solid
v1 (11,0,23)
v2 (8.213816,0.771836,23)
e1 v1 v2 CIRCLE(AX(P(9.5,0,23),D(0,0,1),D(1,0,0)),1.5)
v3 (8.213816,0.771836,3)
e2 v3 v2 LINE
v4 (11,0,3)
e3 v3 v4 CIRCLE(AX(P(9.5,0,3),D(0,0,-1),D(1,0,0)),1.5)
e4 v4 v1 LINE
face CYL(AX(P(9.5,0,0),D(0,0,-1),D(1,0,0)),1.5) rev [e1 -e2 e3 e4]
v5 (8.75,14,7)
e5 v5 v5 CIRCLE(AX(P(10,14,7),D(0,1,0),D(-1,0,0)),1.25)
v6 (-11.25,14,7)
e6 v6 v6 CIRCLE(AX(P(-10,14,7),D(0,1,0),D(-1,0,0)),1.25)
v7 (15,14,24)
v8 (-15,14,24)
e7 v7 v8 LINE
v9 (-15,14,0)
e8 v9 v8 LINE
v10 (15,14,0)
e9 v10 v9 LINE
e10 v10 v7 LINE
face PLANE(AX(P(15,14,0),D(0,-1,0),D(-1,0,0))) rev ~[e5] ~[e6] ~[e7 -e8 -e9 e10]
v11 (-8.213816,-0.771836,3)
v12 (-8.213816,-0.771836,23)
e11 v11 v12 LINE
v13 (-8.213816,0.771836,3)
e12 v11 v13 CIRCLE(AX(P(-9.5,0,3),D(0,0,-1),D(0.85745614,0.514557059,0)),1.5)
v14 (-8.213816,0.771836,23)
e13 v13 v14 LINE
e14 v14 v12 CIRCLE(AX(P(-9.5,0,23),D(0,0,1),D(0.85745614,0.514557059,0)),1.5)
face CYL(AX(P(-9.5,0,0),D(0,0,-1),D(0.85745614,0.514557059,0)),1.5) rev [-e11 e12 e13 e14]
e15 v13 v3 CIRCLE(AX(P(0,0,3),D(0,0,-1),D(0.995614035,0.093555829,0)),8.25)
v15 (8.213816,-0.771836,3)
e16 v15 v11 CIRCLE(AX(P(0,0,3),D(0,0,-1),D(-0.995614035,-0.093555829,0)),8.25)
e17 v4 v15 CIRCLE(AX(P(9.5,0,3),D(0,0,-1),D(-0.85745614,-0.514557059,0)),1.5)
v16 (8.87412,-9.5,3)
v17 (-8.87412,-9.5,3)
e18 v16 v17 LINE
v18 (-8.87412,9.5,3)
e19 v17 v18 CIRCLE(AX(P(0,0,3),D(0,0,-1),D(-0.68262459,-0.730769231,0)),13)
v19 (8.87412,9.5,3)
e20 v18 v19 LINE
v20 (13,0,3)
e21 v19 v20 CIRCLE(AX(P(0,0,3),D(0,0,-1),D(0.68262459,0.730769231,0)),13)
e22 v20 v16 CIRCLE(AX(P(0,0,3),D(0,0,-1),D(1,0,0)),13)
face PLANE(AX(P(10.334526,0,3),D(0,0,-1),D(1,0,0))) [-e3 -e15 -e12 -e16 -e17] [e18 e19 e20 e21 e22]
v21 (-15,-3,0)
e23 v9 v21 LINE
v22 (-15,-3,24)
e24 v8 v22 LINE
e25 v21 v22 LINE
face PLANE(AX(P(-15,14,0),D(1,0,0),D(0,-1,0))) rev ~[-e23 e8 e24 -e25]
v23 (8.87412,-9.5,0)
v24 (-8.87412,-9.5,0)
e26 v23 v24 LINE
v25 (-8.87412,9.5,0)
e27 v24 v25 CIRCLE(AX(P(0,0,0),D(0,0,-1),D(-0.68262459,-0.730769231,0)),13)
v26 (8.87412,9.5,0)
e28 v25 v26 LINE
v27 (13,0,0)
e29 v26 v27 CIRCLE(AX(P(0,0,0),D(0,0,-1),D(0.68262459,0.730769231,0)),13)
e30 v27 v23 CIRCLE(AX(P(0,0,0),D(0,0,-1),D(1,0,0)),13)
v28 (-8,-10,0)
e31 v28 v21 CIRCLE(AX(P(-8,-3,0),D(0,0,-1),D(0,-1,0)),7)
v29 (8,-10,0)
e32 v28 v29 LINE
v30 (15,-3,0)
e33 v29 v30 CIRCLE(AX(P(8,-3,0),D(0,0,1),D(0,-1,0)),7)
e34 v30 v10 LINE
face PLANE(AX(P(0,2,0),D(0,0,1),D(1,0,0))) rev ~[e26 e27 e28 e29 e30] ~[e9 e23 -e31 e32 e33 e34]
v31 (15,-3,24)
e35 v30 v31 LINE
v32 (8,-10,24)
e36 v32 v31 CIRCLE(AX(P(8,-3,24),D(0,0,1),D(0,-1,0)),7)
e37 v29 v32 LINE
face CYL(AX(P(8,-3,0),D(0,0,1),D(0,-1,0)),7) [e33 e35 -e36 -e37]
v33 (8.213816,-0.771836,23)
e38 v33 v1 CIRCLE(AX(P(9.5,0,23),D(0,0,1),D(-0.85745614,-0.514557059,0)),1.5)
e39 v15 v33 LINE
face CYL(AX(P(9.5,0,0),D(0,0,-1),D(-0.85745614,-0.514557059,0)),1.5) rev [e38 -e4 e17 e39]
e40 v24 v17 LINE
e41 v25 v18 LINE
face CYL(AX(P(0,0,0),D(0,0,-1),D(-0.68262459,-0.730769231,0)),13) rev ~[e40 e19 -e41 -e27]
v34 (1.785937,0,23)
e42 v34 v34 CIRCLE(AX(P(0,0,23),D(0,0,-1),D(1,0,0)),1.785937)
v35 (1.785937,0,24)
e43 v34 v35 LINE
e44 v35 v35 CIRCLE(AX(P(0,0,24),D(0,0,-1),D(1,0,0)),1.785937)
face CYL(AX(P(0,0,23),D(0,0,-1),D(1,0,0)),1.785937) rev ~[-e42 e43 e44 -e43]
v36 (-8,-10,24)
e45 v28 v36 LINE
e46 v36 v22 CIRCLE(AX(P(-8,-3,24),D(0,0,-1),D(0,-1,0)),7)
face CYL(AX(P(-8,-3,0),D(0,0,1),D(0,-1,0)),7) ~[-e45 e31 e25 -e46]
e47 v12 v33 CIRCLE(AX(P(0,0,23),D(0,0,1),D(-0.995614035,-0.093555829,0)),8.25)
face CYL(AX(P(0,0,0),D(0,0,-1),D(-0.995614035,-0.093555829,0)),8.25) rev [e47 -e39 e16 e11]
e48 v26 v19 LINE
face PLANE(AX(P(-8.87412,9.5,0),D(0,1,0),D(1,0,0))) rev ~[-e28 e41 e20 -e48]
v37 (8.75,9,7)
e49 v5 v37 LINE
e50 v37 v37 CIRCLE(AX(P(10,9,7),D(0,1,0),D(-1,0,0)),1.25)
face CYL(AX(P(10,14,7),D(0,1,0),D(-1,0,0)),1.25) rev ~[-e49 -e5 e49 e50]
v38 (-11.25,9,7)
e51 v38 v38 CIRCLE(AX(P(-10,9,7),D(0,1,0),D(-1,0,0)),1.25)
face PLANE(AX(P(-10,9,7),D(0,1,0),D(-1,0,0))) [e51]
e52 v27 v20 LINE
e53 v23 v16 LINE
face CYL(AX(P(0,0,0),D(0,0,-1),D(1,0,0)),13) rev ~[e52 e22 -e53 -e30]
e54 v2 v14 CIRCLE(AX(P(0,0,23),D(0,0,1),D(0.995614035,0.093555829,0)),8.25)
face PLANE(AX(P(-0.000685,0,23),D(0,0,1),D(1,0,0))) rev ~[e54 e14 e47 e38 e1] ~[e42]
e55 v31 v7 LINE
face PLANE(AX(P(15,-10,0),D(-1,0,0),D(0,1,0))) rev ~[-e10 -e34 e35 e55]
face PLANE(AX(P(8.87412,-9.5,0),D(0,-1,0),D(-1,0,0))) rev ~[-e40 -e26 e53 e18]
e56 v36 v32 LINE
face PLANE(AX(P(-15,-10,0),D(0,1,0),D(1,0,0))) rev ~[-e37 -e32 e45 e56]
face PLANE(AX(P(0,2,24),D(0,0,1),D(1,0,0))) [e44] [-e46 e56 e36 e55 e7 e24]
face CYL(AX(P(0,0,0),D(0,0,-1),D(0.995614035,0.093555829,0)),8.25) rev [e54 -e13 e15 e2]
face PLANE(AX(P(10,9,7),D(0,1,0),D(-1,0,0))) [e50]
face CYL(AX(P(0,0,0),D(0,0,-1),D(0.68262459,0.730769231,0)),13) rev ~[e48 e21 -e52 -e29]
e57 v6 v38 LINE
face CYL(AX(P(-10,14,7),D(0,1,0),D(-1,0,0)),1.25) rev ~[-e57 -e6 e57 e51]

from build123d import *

# Parameters (mm, degrees)
F1_DEPTH = 24
F3_DEPTH = 23
F4_R     = 1.7859375
F5_DEPTH = 25
F7_DEPTH = 3
F8_R     = 1.25
F9_DEPTH = 5
F10_R    = 7


with BuildPart() as f1:
    # F0 (on Top) → F1 (new body)
    with BuildSketch(Plane.XY):
        Polygon((-15, -10), (15, -10), (15, 0), (15, 10), (15, 14), (-15, 14), (-15, 10), (-15, 0), align=None)
    extrude(amount=F1_DEPTH)

    # F2 (on Top) → F3 (cut)
    with BuildSketch(Plane.XY):
        with BuildLine():
            ThreePointArc((-8.2138157895, 0.7718355891), (-8.0544419216, 0.4004520472), (-8, 0))
            ThreePointArc((-8, 0), (-8.0544419216, -0.4004520472), (-8.2138157895, -0.7718355891))
            ThreePointArc((-8.2138157895, -0.7718355891), (0, -8.25), (8.2138157895, -0.7718355891))
            ThreePointArc((8.2138157895, -0.7718355891), (8, 0), (8.2138157895, 0.7718355891))
            ThreePointArc((8.2138157895, 0.7718355891), (0, 8.25), (-8.2138157895, 0.7718355891))
        make_face()
        with BuildLine():
            ThreePointArc((-8.2138157895, -0.7718355891), (-8.25, 0), (-8.2138157895, 0.7718355891))
            ThreePointArc((-8.2138157895, 0.7718355891), (-11, 0), (-8.2138157895, -0.7718355891))
        make_face()
        with BuildLine():
            ThreePointArc((-8.2138157895, -0.7718355891), (-8.0544419216, -0.4004520472), (-8, 0))
            ThreePointArc((-8, 0), (-8.0544419216, 0.4004520472), (-8.2138157895, 0.7718355891))
            ThreePointArc((-8.2138157895, 0.7718355891), (-8.25, 0), (-8.2138157895, -0.7718355891))
        make_face()
        with BuildLine():
            ThreePointArc((8.25, 0), (8.2409489825, 0.3863416473), (8.2138157895, 0.7718355891))
            ThreePointArc((8.2138157895, 0.7718355891), (8, 0), (8.2138157895, -0.7718355891))
            ThreePointArc((8.2138157895, -0.7718355891), (8.2409489825, -0.3863416473), (8.25, 0))
        make_face()
        with BuildLine():
            ThreePointArc((11, 0), (9.9004520472, 1.4455580784), (8.2138157895, 0.7718355891))
            ThreePointArc((8.2138157895, 0.7718355891), (8.2409489825, 0.3863416473), (8.25, 0))
            ThreePointArc((8.25, 0), (8.2409489825, -0.3863416473), (8.2138157895, -0.7718355891))
            ThreePointArc((8.2138157895, -0.7718355891), (9.9004520472, -1.4455580784), (11, 0))
        make_face()
    extrude(amount=F3_DEPTH, mode=Mode.SUBTRACT)

    # F4 (on face) → F5 (cut)
    with BuildSketch(Plane(origin=(0, 0, 23), x_dir=(1, 0, 0), z_dir=(0, 0, -1))):
        Circle(F4_R)
    extrude(amount=-F5_DEPTH, mode=Mode.SUBTRACT)

    # F6 (on face) → F7 (cut)
    with BuildSketch(Plane(origin=(0, 0, 0), x_dir=(1, 0, 0), z_dir=(0, 0, -1))):
        with BuildLine():
            ThreePointArc((8.8741196746, -9.5), (11.9240000791, -5.1786312974), (13, 0))
            ThreePointArc((13, 0), (11.9240000791, 5.1786312974), (8.8741196746, 9.5))
            Line((8.8741196746, 9.5), (8.8741196746, 1.3631851739))
            ThreePointArc((8.8741196746, 1.3631851739), (11, 0), (8.8741196746, -1.3631851739))
            Line((8.8741196746, -1.3631851739), (8.8741196746, -9.5))
        make_face()
        with BuildLine():
            Line((8.8741196746, 1.3631851739), (8.8741196746, 9.5))
            Line((8.8741196746, 9.5), (-8.8741196746, 9.5))
            Line((-8.8741196746, 9.5), (-8.8741196746, 1.3631851739))
            ThreePointArc((-8.8741196746, 1.3631851739), (-8.4992896122, 1.1173981921), (-8.2138157895, 0.7718355891))
            ThreePointArc((-8.2138157895, 0.7718355891), (0, 8.25), (8.2138157895, 0.7718355891))
            ThreePointArc((8.2138157895, 0.7718355891), (8.4992896122, 1.1173981921), (8.8741196746, 1.3631851739))
        make_face()
        with BuildLine():
            Line((-8.8741196746, -9.5), (8.8741196746, -9.5))
            Line((8.8741196746, -9.5), (8.8741196746, -1.3631851739))
            ThreePointArc((8.8741196746, -1.3631851739), (8.4992896122, -1.1173981921), (8.2138157895, -0.7718355891))
            ThreePointArc((8.2138157895, -0.7718355891), (0, -8.25), (-8.2138157895, -0.7718355891))
            ThreePointArc((-8.2138157895, -0.7718355891), (-8.4992896122, -1.1173981921), (-8.8741196746, -1.3631851739))
            Line((-8.8741196746, -1.3631851739), (-8.8741196746, -9.5))
        make_face()
        with BuildLine():
            Line((-8.8741196746, 1.3631851739), (-8.8741196746, 9.5))
            ThreePointArc((-8.8741196746, 9.5), (-13, 0), (-8.8741196746, -9.5))
            Line((-8.8741196746, -9.5), (-8.8741196746, -1.3631851739))
            ThreePointArc((-8.8741196746, -1.3631851739), (-11, 0), (-8.8741196746, 1.3631851739))
        make_face()
        with BuildLine():
            ThreePointArc((8.8741196746, -1.3631851739), (11, 0), (8.8741196746, 1.3631851739))
            Line((8.8741196746, 1.3631851739), (8.8741196746, -1.3631851739))
        make_face()
        with BuildLine():
            Line((8.8741196746, -1.3631851739), (8.8741196746, 1.3631851739))
            ThreePointArc((8.8741196746, 1.3631851739), (8.4992896122, 1.1173981921), (8.2138157895, 0.7718355891))
            ThreePointArc((8.2138157895, 0.7718355891), (0, 8.25), (-8.2138157895, 0.7718355891))
            ThreePointArc((-8.2138157895, 0.7718355891), (-8.4992896122, 1.1173981921), (-8.8741196746, 1.3631851739))
            Line((-8.8741196746, 1.3631851739), (-8.8741196746, -1.3631851739))
            ThreePointArc((-8.8741196746, -1.3631851739), (-8.4992896122, -1.1173981921), (-8.2138157895, -0.7718355891))
            ThreePointArc((-8.2138157895, -0.7718355891), (0, -8.25), (8.2138157895, -0.7718355891))
            ThreePointArc((8.2138157895, -0.7718355891), (8.4992896122, -1.1173981921), (8.8741196746, -1.3631851739))
        make_face()
        with BuildLine():
            Line((-8.8741196746, -1.3631851739), (-8.8741196746, 1.3631851739))
            ThreePointArc((-8.8741196746, 1.3631851739), (-11, 0), (-8.8741196746, -1.3631851739))
        make_face()
    extrude(amount=-F7_DEPTH, mode=Mode.SUBTRACT)

    # F8 (on face) → F9 (cut)
    with BuildSketch(Plane(origin=(0, 14, 0), x_dir=(-1, 0, 0), z_dir=(0, 1, 0))):
        with Locations((-10, 7)):
            Circle(F8_R)
        with Locations((10, 7)):
            Circle(F8_R)
    extrude(amount=-F9_DEPTH, mode=Mode.SUBTRACT)

    # F10
    f10_edges = [f1.edges().sort_by_distance(p)[0] for p in [
        (-15, -10, 12),
        (15, -10, 12),
    ]]
    fillet(f10_edges, radius=F10_R)


solid = f1.part
